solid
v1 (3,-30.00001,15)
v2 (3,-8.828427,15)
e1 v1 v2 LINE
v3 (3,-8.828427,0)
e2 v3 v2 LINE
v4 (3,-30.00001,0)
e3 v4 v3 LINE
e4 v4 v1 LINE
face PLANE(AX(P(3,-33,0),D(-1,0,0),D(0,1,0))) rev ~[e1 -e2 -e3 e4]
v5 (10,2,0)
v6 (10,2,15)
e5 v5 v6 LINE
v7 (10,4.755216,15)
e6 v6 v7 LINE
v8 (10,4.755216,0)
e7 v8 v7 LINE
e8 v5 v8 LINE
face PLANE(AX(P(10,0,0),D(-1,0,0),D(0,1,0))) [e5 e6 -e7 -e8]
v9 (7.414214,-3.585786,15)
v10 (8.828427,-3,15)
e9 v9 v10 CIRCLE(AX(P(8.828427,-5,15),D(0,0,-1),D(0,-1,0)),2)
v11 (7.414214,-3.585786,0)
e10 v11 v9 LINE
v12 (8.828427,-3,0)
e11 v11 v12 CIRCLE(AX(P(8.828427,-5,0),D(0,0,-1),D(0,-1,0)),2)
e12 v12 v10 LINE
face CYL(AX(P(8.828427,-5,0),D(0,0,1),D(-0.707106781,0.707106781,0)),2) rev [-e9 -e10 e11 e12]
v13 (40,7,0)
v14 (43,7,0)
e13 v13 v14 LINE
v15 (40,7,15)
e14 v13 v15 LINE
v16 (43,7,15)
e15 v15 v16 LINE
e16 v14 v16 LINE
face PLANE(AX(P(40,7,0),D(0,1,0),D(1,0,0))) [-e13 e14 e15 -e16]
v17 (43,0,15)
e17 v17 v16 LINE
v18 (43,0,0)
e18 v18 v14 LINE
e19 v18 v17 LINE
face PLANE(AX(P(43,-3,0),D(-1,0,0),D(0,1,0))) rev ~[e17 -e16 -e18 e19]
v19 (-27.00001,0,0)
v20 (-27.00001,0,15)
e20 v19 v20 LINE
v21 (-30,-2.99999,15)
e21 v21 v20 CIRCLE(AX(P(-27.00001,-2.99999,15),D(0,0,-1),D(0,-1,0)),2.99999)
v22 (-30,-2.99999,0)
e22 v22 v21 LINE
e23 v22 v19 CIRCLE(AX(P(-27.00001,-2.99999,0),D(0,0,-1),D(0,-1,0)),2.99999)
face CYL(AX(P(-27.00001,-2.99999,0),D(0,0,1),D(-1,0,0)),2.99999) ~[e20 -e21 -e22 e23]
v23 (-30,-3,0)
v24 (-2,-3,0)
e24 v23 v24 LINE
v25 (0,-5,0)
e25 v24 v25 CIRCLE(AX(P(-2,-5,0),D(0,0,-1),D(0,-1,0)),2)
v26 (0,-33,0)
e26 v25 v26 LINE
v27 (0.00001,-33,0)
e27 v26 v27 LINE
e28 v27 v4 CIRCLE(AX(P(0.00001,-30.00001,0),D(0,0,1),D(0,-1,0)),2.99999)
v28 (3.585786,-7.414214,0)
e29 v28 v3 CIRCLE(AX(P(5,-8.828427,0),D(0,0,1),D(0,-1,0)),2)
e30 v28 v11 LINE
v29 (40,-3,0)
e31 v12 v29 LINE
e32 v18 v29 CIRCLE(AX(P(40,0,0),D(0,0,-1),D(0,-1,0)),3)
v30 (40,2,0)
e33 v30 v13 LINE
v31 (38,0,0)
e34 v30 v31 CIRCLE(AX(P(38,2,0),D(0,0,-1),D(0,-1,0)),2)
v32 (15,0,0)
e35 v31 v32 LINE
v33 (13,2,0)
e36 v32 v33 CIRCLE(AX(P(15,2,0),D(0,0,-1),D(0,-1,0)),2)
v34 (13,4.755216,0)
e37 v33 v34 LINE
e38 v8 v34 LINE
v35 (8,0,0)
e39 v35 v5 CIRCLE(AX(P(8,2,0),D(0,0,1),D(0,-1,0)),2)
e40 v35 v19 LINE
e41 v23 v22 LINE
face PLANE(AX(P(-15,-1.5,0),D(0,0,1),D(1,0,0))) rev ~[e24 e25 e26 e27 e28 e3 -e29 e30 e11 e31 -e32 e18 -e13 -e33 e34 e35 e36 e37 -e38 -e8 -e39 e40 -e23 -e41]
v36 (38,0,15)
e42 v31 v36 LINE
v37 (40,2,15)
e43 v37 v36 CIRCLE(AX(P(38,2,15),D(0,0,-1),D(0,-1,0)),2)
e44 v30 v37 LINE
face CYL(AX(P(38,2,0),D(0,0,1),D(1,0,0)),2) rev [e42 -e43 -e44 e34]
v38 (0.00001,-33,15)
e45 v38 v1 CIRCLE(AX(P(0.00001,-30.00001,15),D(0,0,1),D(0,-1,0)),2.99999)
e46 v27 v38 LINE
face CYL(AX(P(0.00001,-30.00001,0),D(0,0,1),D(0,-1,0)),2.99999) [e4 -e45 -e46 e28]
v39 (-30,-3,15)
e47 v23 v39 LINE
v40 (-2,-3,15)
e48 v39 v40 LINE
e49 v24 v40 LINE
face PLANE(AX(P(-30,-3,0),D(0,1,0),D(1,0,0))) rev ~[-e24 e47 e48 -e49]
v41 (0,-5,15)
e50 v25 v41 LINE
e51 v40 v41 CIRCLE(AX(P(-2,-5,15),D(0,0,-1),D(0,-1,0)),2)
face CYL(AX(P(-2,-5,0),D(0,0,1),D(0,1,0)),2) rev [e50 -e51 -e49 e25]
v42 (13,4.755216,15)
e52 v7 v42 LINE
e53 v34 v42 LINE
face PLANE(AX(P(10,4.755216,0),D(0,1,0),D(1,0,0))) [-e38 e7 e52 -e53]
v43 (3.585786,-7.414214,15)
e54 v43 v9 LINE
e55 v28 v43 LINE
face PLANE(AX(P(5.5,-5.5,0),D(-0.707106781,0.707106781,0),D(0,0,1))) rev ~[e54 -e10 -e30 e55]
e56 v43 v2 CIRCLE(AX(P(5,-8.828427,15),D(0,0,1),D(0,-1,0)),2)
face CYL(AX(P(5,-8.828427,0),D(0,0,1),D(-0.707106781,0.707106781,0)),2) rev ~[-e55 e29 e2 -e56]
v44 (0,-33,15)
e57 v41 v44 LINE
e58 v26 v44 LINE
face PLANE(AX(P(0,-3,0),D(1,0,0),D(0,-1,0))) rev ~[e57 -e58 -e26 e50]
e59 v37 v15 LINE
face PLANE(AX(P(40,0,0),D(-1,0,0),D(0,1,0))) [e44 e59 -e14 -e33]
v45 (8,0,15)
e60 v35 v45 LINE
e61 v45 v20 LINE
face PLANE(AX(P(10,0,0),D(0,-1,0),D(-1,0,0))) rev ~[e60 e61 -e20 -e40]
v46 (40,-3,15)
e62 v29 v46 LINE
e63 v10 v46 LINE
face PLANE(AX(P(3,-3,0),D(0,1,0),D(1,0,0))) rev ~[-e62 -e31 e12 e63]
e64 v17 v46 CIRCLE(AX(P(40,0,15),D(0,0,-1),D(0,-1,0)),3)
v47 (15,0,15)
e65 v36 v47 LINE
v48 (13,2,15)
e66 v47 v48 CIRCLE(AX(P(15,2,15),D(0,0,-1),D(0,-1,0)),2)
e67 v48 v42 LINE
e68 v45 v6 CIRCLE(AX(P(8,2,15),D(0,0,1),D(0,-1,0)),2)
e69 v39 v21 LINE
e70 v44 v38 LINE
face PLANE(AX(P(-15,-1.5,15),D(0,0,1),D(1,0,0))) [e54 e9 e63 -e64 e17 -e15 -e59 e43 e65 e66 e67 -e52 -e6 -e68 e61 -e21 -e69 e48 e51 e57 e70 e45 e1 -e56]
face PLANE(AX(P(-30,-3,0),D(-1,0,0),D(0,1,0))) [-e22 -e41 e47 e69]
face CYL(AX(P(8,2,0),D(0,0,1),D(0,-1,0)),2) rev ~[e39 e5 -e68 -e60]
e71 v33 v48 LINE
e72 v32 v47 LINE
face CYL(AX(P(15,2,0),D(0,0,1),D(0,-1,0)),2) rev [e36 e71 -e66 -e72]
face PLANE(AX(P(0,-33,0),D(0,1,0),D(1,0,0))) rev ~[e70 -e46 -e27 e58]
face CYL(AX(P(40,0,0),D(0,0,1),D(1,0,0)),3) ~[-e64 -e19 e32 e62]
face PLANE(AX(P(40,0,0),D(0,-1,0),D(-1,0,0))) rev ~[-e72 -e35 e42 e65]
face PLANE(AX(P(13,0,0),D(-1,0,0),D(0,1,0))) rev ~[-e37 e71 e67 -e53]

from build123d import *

# Parameters (mm, degrees)
F0_W     = 30
F0_H     = 3
F0_W_2   = 3
F0_H_2   = 4.7552157193
F0_H_3   = 7
F1_DEPTH = 15
F2_R     = 2
F3_SIZE  = 5
F4_R     = 2
F5_R     = 3
F6_R     = 2.99999
F7_R     = 2.99999
F8_R     = 2
F9_R     = 2


# Not quite as in the source:
# - a fillet or chamfer is up to 0.001 mm smaller than in the source, because OpenCascade refuses the exact size


with BuildPart() as f1:
    # F0 (on Top) → F1 (new body)
    with BuildSketch(Plane.XY):
        with Locations((-15, -1.5)):
            Rectangle(F0_W, F0_H)
        Polygon((3, 0), (0, 0), (0, -3), (0, -33), (3, -33), (3, -3), align=None)
        Polygon((10, 0), (3, 0), (3, -3), (43, -3), (43, 0), (40, 0), (13, 0), align=None)
        with Locations((11.5, 2.3776078597)):
            Rectangle(F0_W_2, F0_H_2)
        with Locations((41.5, 3.5)):
            Rectangle(F0_W_2, F0_H_3)
    extrude(amount=F1_DEPTH)

    # F2
    f2_edges = [f1.edges().sort_by_distance(p)[0] for p in [
        (0, -3, 7.5),
    ]]
    fillet(f2_edges, radius=F2_R)

    # F3
    f3_edges = [f1.edges().sort_by_distance(p)[0] for p in [
        (3, -3, 7.5),
    ]]
    chamfer(f3_edges, length=F3_SIZE)

    # F4
    f4_edges = [f1.edges().sort_by_distance(p)[0] for p in [
        (13, 0, 7.5),
        (40, 0, 7.5),
        (10, 0, 7.5),
    ]]
    fillet(f4_edges, radius=F4_R)

    # F5
    f5_edges = [f1.edges().sort_by_distance(p)[0] for p in [
        (43, -3, 7.5),
    ]]
    fillet(f5_edges, radius=F5_R)

    # F6 (radius 3 in the source; OpenCascade refuses exactly that, so slightly less here)
    f6_edges = [f1.edges().sort_by_distance(p)[0] for p in [
        (-30, 0, 7.5),
    ]]
    fillet(f6_edges, radius=F6_R)

    # F7 (radius 3 in the source; OpenCascade refuses exactly that, so slightly less here)
    f7_edges = [f1.edges().sort_by_distance(p)[0] for p in [
        (3, -33, 7.5),
    ]]
    fillet(f7_edges, radius=F7_R)

    # F8
    f8_edges = [f1.edges().sort_by_distance(p)[0] for p in [
        (8, -3, 7.5),
    ]]
    fillet(f8_edges, radius=F8_R)

    # F9
    f9_edges = [f1.edges().sort_by_distance(p)[0] for p in [
        (3, -8, 7.5),
    ]]
    fillet(f9_edges, radius=F9_R)


solid = f1.part
